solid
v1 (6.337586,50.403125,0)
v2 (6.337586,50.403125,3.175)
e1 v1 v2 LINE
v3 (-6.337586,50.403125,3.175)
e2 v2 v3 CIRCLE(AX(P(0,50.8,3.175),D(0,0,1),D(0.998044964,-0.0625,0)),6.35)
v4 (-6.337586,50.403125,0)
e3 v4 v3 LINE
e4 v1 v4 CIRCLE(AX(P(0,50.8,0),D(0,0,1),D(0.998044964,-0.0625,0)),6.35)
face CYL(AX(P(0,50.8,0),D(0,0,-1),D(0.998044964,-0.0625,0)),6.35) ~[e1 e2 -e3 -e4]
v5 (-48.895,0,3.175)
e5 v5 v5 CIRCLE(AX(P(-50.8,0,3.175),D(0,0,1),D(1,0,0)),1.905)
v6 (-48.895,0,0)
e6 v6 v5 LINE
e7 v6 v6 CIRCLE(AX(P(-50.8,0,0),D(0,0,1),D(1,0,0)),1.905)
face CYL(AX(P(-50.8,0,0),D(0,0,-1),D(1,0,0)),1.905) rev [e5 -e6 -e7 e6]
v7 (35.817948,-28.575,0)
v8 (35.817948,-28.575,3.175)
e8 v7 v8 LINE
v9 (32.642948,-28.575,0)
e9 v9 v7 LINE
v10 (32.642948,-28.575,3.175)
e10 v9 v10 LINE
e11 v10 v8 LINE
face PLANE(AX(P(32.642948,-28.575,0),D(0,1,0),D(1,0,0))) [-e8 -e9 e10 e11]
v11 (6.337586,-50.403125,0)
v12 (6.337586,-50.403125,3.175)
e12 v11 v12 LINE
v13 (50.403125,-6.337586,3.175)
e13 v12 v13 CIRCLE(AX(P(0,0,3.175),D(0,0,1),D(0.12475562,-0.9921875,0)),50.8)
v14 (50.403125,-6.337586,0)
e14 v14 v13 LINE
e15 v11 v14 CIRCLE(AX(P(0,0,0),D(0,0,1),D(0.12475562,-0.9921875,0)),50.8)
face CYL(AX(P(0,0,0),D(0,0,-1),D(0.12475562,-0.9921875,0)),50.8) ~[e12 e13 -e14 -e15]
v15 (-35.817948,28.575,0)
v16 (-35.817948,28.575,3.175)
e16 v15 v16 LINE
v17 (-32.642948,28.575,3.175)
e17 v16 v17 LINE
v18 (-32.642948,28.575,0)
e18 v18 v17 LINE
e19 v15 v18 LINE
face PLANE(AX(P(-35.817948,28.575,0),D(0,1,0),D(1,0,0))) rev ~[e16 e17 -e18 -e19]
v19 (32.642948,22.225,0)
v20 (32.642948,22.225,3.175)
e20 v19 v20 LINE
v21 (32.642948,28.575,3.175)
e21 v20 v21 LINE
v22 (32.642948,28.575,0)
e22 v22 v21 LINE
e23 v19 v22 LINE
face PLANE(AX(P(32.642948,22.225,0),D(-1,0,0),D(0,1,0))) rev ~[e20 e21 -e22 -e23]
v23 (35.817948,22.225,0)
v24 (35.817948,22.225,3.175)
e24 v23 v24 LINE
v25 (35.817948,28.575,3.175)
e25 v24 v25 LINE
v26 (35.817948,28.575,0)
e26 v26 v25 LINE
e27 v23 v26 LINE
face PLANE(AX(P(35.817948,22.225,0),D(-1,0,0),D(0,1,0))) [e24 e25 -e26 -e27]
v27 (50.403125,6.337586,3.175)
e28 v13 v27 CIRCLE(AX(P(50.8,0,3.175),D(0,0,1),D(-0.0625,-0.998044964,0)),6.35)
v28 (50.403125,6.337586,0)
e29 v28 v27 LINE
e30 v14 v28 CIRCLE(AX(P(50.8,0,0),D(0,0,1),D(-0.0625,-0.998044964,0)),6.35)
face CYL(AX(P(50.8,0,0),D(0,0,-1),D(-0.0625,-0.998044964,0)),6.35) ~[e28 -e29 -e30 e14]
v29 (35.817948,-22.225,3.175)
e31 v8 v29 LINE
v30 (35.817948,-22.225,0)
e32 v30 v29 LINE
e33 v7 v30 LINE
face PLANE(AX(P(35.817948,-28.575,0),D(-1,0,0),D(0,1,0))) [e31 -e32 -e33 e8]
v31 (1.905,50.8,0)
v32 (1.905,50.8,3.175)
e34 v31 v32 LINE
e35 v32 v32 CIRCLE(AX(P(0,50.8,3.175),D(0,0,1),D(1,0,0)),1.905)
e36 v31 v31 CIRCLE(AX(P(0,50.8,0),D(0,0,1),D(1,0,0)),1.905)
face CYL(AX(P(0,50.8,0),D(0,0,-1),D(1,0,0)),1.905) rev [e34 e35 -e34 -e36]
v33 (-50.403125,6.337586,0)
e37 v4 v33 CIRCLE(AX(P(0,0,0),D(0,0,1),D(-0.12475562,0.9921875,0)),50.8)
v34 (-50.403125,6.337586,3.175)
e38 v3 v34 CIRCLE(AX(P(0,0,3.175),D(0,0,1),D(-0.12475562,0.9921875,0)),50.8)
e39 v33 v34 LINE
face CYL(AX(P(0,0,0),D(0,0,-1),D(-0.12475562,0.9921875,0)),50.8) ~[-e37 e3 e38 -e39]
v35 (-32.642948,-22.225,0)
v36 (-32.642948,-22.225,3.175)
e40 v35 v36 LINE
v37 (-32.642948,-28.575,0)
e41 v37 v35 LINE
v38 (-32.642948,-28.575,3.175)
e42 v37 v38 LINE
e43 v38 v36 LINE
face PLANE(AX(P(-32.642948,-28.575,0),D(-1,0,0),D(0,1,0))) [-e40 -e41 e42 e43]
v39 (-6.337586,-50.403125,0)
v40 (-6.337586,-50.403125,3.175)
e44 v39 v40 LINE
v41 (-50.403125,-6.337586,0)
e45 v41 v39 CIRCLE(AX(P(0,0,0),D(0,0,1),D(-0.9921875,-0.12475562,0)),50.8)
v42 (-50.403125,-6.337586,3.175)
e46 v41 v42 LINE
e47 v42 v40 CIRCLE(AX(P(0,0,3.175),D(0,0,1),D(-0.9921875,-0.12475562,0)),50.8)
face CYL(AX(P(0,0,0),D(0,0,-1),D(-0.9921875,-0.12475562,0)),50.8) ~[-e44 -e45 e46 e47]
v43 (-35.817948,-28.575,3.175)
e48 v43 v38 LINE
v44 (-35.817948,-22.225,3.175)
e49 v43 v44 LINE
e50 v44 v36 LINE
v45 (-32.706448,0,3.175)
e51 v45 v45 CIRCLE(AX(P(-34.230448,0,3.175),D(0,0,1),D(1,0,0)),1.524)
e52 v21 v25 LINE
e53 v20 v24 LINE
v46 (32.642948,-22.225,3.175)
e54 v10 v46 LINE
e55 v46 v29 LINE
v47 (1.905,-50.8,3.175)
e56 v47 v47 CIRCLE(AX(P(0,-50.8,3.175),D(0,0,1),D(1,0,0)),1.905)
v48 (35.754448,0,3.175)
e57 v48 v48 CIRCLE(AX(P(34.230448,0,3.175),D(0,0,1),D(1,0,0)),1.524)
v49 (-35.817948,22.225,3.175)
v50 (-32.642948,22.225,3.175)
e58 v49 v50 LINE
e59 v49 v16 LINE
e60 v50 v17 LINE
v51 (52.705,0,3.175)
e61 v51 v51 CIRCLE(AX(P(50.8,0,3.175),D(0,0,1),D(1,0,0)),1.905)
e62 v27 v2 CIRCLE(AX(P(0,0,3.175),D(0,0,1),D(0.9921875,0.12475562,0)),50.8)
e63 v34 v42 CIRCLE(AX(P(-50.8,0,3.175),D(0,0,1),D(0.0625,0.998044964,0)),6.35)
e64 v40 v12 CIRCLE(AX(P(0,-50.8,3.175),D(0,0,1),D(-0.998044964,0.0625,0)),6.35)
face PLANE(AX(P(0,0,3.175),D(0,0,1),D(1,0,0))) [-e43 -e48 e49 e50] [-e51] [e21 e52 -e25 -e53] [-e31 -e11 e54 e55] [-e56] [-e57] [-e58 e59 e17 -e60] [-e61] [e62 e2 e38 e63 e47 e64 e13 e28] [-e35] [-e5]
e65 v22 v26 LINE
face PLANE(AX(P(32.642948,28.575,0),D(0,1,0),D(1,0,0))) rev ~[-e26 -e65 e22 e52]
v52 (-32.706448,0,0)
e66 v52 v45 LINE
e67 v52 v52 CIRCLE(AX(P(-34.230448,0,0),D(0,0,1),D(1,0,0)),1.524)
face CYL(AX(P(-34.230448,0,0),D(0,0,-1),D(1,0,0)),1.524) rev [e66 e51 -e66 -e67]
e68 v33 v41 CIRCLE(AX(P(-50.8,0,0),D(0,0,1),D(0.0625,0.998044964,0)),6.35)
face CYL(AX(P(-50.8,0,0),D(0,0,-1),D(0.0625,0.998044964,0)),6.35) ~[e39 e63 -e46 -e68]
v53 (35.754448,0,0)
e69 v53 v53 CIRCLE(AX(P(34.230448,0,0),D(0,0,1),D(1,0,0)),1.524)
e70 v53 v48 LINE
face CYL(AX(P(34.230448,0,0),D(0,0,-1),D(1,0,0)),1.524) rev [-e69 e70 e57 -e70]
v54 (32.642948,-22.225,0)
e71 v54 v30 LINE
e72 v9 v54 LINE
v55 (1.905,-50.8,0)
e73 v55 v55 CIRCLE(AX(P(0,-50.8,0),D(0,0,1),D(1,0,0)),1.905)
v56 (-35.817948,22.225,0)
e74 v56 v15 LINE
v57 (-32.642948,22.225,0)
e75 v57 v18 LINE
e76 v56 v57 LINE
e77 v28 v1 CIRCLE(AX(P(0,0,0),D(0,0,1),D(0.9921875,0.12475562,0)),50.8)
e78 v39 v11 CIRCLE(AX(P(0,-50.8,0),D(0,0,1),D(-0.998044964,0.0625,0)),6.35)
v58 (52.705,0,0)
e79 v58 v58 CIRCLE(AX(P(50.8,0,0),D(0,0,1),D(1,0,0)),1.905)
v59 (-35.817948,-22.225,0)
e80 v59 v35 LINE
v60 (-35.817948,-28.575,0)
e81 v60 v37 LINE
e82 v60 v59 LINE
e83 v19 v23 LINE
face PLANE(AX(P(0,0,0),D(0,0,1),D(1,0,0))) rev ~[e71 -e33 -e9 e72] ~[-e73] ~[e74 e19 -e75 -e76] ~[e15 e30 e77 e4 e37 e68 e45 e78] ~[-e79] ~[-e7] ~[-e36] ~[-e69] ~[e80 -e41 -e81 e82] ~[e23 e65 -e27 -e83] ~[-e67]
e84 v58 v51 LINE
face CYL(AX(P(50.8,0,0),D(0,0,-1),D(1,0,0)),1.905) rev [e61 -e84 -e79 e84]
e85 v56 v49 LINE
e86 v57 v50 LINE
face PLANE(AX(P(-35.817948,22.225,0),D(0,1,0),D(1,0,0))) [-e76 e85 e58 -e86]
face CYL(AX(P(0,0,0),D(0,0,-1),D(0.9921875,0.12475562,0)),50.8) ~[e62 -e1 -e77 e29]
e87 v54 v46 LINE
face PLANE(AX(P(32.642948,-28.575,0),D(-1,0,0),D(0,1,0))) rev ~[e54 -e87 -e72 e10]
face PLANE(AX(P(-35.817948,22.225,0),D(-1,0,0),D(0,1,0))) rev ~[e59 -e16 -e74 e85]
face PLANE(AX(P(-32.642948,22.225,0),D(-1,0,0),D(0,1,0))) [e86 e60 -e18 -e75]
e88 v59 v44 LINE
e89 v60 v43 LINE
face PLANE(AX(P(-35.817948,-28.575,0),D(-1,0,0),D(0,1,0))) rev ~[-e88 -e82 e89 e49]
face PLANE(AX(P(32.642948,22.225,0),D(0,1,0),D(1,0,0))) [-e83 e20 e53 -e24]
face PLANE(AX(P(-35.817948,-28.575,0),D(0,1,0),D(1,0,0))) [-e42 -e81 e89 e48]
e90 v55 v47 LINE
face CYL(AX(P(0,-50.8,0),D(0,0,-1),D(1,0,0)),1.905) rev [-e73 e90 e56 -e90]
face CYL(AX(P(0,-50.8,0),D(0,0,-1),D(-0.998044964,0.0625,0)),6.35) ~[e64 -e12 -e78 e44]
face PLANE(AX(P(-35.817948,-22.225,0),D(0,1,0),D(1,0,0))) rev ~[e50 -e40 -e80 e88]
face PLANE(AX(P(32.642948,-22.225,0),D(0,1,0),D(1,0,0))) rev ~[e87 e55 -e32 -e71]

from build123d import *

# Parameters (mm, degrees)
F0_W     = 3.175
F0_H     = 6.35
F0_R     = 1.905
F0_R_2   = 1.524
F1_DEPTH = 3.175


# Not quite as in the source:
# - a length typed as a fraction of an inch, garbled in the dataset ("3 / 203.2 mm" for 3/8 in), is restored


with BuildPart() as f1:
    # F0 (on Top) → F1 (new body)
    with BuildSketch(Plane.XY):
        with BuildLine():
            ThreePointArc((-50.403125, 6.3375855209), (-57.15, 0), (-50.403125, -6.3375855209))
            ThreePointArc((-50.403125, -6.3375855209), (-35.9210244843, -35.9210244843), (-6.3375855209, -50.403125))
            ThreePointArc((-6.3375855209, -50.403125), (0, -57.15), (6.3375855209, -50.403125))
            ThreePointArc((6.3375855209, -50.403125), (35.9210244843, -35.9210244843), (50.403125, -6.3375855209))
            ThreePointArc((50.403125, -6.3375855209), (57.15, 0), (50.403125, 6.3375855209))
            ThreePointArc((50.403125, 6.3375855209), (35.9210244843, 35.9210244843), (6.3375855209, 50.403125))
            ThreePointArc((6.3375855209, 50.403125), (0, 57.15), (-6.3375855209, 50.403125))
            ThreePointArc((-6.3375855209, 50.403125), (-35.9210244843, 35.9210244843), (-50.403125, 6.3375855209))
        make_face()
        with Locations((-34.2304483056, -25.4)):
            Rectangle(F0_W, F0_H, mode=Mode.SUBTRACT)
        with Locations((0, -50.8)):
            Circle(F0_R, mode=Mode.SUBTRACT)
        with Locations((34.2304483056, -25.4)):
            Rectangle(F0_W, F0_H, mode=Mode.SUBTRACT)
        with Locations((-50.8, 0)):
            Circle(F0_R, mode=Mode.SUBTRACT)
        with Locations((-34.2304483056, 0)):
            Circle(F0_R_2, mode=Mode.SUBTRACT)
        with Locations((-34.2304483056, 25.4)):
            Rectangle(F0_W, F0_H, mode=Mode.SUBTRACT)
        with Locations((34.2304483056, 0)):
            Circle(F0_R_2, mode=Mode.SUBTRACT)
        with Locations((50.8, 0)):
            Circle(F0_R, mode=Mode.SUBTRACT)
        with Locations((34.2304483056, 25.4)):
            Rectangle(F0_W, F0_H, mode=Mode.SUBTRACT)
        with Locations((0, 50.8)):
            Circle(F0_R, mode=Mode.SUBTRACT)
    extrude(amount=F1_DEPTH)


solid = f1.part
